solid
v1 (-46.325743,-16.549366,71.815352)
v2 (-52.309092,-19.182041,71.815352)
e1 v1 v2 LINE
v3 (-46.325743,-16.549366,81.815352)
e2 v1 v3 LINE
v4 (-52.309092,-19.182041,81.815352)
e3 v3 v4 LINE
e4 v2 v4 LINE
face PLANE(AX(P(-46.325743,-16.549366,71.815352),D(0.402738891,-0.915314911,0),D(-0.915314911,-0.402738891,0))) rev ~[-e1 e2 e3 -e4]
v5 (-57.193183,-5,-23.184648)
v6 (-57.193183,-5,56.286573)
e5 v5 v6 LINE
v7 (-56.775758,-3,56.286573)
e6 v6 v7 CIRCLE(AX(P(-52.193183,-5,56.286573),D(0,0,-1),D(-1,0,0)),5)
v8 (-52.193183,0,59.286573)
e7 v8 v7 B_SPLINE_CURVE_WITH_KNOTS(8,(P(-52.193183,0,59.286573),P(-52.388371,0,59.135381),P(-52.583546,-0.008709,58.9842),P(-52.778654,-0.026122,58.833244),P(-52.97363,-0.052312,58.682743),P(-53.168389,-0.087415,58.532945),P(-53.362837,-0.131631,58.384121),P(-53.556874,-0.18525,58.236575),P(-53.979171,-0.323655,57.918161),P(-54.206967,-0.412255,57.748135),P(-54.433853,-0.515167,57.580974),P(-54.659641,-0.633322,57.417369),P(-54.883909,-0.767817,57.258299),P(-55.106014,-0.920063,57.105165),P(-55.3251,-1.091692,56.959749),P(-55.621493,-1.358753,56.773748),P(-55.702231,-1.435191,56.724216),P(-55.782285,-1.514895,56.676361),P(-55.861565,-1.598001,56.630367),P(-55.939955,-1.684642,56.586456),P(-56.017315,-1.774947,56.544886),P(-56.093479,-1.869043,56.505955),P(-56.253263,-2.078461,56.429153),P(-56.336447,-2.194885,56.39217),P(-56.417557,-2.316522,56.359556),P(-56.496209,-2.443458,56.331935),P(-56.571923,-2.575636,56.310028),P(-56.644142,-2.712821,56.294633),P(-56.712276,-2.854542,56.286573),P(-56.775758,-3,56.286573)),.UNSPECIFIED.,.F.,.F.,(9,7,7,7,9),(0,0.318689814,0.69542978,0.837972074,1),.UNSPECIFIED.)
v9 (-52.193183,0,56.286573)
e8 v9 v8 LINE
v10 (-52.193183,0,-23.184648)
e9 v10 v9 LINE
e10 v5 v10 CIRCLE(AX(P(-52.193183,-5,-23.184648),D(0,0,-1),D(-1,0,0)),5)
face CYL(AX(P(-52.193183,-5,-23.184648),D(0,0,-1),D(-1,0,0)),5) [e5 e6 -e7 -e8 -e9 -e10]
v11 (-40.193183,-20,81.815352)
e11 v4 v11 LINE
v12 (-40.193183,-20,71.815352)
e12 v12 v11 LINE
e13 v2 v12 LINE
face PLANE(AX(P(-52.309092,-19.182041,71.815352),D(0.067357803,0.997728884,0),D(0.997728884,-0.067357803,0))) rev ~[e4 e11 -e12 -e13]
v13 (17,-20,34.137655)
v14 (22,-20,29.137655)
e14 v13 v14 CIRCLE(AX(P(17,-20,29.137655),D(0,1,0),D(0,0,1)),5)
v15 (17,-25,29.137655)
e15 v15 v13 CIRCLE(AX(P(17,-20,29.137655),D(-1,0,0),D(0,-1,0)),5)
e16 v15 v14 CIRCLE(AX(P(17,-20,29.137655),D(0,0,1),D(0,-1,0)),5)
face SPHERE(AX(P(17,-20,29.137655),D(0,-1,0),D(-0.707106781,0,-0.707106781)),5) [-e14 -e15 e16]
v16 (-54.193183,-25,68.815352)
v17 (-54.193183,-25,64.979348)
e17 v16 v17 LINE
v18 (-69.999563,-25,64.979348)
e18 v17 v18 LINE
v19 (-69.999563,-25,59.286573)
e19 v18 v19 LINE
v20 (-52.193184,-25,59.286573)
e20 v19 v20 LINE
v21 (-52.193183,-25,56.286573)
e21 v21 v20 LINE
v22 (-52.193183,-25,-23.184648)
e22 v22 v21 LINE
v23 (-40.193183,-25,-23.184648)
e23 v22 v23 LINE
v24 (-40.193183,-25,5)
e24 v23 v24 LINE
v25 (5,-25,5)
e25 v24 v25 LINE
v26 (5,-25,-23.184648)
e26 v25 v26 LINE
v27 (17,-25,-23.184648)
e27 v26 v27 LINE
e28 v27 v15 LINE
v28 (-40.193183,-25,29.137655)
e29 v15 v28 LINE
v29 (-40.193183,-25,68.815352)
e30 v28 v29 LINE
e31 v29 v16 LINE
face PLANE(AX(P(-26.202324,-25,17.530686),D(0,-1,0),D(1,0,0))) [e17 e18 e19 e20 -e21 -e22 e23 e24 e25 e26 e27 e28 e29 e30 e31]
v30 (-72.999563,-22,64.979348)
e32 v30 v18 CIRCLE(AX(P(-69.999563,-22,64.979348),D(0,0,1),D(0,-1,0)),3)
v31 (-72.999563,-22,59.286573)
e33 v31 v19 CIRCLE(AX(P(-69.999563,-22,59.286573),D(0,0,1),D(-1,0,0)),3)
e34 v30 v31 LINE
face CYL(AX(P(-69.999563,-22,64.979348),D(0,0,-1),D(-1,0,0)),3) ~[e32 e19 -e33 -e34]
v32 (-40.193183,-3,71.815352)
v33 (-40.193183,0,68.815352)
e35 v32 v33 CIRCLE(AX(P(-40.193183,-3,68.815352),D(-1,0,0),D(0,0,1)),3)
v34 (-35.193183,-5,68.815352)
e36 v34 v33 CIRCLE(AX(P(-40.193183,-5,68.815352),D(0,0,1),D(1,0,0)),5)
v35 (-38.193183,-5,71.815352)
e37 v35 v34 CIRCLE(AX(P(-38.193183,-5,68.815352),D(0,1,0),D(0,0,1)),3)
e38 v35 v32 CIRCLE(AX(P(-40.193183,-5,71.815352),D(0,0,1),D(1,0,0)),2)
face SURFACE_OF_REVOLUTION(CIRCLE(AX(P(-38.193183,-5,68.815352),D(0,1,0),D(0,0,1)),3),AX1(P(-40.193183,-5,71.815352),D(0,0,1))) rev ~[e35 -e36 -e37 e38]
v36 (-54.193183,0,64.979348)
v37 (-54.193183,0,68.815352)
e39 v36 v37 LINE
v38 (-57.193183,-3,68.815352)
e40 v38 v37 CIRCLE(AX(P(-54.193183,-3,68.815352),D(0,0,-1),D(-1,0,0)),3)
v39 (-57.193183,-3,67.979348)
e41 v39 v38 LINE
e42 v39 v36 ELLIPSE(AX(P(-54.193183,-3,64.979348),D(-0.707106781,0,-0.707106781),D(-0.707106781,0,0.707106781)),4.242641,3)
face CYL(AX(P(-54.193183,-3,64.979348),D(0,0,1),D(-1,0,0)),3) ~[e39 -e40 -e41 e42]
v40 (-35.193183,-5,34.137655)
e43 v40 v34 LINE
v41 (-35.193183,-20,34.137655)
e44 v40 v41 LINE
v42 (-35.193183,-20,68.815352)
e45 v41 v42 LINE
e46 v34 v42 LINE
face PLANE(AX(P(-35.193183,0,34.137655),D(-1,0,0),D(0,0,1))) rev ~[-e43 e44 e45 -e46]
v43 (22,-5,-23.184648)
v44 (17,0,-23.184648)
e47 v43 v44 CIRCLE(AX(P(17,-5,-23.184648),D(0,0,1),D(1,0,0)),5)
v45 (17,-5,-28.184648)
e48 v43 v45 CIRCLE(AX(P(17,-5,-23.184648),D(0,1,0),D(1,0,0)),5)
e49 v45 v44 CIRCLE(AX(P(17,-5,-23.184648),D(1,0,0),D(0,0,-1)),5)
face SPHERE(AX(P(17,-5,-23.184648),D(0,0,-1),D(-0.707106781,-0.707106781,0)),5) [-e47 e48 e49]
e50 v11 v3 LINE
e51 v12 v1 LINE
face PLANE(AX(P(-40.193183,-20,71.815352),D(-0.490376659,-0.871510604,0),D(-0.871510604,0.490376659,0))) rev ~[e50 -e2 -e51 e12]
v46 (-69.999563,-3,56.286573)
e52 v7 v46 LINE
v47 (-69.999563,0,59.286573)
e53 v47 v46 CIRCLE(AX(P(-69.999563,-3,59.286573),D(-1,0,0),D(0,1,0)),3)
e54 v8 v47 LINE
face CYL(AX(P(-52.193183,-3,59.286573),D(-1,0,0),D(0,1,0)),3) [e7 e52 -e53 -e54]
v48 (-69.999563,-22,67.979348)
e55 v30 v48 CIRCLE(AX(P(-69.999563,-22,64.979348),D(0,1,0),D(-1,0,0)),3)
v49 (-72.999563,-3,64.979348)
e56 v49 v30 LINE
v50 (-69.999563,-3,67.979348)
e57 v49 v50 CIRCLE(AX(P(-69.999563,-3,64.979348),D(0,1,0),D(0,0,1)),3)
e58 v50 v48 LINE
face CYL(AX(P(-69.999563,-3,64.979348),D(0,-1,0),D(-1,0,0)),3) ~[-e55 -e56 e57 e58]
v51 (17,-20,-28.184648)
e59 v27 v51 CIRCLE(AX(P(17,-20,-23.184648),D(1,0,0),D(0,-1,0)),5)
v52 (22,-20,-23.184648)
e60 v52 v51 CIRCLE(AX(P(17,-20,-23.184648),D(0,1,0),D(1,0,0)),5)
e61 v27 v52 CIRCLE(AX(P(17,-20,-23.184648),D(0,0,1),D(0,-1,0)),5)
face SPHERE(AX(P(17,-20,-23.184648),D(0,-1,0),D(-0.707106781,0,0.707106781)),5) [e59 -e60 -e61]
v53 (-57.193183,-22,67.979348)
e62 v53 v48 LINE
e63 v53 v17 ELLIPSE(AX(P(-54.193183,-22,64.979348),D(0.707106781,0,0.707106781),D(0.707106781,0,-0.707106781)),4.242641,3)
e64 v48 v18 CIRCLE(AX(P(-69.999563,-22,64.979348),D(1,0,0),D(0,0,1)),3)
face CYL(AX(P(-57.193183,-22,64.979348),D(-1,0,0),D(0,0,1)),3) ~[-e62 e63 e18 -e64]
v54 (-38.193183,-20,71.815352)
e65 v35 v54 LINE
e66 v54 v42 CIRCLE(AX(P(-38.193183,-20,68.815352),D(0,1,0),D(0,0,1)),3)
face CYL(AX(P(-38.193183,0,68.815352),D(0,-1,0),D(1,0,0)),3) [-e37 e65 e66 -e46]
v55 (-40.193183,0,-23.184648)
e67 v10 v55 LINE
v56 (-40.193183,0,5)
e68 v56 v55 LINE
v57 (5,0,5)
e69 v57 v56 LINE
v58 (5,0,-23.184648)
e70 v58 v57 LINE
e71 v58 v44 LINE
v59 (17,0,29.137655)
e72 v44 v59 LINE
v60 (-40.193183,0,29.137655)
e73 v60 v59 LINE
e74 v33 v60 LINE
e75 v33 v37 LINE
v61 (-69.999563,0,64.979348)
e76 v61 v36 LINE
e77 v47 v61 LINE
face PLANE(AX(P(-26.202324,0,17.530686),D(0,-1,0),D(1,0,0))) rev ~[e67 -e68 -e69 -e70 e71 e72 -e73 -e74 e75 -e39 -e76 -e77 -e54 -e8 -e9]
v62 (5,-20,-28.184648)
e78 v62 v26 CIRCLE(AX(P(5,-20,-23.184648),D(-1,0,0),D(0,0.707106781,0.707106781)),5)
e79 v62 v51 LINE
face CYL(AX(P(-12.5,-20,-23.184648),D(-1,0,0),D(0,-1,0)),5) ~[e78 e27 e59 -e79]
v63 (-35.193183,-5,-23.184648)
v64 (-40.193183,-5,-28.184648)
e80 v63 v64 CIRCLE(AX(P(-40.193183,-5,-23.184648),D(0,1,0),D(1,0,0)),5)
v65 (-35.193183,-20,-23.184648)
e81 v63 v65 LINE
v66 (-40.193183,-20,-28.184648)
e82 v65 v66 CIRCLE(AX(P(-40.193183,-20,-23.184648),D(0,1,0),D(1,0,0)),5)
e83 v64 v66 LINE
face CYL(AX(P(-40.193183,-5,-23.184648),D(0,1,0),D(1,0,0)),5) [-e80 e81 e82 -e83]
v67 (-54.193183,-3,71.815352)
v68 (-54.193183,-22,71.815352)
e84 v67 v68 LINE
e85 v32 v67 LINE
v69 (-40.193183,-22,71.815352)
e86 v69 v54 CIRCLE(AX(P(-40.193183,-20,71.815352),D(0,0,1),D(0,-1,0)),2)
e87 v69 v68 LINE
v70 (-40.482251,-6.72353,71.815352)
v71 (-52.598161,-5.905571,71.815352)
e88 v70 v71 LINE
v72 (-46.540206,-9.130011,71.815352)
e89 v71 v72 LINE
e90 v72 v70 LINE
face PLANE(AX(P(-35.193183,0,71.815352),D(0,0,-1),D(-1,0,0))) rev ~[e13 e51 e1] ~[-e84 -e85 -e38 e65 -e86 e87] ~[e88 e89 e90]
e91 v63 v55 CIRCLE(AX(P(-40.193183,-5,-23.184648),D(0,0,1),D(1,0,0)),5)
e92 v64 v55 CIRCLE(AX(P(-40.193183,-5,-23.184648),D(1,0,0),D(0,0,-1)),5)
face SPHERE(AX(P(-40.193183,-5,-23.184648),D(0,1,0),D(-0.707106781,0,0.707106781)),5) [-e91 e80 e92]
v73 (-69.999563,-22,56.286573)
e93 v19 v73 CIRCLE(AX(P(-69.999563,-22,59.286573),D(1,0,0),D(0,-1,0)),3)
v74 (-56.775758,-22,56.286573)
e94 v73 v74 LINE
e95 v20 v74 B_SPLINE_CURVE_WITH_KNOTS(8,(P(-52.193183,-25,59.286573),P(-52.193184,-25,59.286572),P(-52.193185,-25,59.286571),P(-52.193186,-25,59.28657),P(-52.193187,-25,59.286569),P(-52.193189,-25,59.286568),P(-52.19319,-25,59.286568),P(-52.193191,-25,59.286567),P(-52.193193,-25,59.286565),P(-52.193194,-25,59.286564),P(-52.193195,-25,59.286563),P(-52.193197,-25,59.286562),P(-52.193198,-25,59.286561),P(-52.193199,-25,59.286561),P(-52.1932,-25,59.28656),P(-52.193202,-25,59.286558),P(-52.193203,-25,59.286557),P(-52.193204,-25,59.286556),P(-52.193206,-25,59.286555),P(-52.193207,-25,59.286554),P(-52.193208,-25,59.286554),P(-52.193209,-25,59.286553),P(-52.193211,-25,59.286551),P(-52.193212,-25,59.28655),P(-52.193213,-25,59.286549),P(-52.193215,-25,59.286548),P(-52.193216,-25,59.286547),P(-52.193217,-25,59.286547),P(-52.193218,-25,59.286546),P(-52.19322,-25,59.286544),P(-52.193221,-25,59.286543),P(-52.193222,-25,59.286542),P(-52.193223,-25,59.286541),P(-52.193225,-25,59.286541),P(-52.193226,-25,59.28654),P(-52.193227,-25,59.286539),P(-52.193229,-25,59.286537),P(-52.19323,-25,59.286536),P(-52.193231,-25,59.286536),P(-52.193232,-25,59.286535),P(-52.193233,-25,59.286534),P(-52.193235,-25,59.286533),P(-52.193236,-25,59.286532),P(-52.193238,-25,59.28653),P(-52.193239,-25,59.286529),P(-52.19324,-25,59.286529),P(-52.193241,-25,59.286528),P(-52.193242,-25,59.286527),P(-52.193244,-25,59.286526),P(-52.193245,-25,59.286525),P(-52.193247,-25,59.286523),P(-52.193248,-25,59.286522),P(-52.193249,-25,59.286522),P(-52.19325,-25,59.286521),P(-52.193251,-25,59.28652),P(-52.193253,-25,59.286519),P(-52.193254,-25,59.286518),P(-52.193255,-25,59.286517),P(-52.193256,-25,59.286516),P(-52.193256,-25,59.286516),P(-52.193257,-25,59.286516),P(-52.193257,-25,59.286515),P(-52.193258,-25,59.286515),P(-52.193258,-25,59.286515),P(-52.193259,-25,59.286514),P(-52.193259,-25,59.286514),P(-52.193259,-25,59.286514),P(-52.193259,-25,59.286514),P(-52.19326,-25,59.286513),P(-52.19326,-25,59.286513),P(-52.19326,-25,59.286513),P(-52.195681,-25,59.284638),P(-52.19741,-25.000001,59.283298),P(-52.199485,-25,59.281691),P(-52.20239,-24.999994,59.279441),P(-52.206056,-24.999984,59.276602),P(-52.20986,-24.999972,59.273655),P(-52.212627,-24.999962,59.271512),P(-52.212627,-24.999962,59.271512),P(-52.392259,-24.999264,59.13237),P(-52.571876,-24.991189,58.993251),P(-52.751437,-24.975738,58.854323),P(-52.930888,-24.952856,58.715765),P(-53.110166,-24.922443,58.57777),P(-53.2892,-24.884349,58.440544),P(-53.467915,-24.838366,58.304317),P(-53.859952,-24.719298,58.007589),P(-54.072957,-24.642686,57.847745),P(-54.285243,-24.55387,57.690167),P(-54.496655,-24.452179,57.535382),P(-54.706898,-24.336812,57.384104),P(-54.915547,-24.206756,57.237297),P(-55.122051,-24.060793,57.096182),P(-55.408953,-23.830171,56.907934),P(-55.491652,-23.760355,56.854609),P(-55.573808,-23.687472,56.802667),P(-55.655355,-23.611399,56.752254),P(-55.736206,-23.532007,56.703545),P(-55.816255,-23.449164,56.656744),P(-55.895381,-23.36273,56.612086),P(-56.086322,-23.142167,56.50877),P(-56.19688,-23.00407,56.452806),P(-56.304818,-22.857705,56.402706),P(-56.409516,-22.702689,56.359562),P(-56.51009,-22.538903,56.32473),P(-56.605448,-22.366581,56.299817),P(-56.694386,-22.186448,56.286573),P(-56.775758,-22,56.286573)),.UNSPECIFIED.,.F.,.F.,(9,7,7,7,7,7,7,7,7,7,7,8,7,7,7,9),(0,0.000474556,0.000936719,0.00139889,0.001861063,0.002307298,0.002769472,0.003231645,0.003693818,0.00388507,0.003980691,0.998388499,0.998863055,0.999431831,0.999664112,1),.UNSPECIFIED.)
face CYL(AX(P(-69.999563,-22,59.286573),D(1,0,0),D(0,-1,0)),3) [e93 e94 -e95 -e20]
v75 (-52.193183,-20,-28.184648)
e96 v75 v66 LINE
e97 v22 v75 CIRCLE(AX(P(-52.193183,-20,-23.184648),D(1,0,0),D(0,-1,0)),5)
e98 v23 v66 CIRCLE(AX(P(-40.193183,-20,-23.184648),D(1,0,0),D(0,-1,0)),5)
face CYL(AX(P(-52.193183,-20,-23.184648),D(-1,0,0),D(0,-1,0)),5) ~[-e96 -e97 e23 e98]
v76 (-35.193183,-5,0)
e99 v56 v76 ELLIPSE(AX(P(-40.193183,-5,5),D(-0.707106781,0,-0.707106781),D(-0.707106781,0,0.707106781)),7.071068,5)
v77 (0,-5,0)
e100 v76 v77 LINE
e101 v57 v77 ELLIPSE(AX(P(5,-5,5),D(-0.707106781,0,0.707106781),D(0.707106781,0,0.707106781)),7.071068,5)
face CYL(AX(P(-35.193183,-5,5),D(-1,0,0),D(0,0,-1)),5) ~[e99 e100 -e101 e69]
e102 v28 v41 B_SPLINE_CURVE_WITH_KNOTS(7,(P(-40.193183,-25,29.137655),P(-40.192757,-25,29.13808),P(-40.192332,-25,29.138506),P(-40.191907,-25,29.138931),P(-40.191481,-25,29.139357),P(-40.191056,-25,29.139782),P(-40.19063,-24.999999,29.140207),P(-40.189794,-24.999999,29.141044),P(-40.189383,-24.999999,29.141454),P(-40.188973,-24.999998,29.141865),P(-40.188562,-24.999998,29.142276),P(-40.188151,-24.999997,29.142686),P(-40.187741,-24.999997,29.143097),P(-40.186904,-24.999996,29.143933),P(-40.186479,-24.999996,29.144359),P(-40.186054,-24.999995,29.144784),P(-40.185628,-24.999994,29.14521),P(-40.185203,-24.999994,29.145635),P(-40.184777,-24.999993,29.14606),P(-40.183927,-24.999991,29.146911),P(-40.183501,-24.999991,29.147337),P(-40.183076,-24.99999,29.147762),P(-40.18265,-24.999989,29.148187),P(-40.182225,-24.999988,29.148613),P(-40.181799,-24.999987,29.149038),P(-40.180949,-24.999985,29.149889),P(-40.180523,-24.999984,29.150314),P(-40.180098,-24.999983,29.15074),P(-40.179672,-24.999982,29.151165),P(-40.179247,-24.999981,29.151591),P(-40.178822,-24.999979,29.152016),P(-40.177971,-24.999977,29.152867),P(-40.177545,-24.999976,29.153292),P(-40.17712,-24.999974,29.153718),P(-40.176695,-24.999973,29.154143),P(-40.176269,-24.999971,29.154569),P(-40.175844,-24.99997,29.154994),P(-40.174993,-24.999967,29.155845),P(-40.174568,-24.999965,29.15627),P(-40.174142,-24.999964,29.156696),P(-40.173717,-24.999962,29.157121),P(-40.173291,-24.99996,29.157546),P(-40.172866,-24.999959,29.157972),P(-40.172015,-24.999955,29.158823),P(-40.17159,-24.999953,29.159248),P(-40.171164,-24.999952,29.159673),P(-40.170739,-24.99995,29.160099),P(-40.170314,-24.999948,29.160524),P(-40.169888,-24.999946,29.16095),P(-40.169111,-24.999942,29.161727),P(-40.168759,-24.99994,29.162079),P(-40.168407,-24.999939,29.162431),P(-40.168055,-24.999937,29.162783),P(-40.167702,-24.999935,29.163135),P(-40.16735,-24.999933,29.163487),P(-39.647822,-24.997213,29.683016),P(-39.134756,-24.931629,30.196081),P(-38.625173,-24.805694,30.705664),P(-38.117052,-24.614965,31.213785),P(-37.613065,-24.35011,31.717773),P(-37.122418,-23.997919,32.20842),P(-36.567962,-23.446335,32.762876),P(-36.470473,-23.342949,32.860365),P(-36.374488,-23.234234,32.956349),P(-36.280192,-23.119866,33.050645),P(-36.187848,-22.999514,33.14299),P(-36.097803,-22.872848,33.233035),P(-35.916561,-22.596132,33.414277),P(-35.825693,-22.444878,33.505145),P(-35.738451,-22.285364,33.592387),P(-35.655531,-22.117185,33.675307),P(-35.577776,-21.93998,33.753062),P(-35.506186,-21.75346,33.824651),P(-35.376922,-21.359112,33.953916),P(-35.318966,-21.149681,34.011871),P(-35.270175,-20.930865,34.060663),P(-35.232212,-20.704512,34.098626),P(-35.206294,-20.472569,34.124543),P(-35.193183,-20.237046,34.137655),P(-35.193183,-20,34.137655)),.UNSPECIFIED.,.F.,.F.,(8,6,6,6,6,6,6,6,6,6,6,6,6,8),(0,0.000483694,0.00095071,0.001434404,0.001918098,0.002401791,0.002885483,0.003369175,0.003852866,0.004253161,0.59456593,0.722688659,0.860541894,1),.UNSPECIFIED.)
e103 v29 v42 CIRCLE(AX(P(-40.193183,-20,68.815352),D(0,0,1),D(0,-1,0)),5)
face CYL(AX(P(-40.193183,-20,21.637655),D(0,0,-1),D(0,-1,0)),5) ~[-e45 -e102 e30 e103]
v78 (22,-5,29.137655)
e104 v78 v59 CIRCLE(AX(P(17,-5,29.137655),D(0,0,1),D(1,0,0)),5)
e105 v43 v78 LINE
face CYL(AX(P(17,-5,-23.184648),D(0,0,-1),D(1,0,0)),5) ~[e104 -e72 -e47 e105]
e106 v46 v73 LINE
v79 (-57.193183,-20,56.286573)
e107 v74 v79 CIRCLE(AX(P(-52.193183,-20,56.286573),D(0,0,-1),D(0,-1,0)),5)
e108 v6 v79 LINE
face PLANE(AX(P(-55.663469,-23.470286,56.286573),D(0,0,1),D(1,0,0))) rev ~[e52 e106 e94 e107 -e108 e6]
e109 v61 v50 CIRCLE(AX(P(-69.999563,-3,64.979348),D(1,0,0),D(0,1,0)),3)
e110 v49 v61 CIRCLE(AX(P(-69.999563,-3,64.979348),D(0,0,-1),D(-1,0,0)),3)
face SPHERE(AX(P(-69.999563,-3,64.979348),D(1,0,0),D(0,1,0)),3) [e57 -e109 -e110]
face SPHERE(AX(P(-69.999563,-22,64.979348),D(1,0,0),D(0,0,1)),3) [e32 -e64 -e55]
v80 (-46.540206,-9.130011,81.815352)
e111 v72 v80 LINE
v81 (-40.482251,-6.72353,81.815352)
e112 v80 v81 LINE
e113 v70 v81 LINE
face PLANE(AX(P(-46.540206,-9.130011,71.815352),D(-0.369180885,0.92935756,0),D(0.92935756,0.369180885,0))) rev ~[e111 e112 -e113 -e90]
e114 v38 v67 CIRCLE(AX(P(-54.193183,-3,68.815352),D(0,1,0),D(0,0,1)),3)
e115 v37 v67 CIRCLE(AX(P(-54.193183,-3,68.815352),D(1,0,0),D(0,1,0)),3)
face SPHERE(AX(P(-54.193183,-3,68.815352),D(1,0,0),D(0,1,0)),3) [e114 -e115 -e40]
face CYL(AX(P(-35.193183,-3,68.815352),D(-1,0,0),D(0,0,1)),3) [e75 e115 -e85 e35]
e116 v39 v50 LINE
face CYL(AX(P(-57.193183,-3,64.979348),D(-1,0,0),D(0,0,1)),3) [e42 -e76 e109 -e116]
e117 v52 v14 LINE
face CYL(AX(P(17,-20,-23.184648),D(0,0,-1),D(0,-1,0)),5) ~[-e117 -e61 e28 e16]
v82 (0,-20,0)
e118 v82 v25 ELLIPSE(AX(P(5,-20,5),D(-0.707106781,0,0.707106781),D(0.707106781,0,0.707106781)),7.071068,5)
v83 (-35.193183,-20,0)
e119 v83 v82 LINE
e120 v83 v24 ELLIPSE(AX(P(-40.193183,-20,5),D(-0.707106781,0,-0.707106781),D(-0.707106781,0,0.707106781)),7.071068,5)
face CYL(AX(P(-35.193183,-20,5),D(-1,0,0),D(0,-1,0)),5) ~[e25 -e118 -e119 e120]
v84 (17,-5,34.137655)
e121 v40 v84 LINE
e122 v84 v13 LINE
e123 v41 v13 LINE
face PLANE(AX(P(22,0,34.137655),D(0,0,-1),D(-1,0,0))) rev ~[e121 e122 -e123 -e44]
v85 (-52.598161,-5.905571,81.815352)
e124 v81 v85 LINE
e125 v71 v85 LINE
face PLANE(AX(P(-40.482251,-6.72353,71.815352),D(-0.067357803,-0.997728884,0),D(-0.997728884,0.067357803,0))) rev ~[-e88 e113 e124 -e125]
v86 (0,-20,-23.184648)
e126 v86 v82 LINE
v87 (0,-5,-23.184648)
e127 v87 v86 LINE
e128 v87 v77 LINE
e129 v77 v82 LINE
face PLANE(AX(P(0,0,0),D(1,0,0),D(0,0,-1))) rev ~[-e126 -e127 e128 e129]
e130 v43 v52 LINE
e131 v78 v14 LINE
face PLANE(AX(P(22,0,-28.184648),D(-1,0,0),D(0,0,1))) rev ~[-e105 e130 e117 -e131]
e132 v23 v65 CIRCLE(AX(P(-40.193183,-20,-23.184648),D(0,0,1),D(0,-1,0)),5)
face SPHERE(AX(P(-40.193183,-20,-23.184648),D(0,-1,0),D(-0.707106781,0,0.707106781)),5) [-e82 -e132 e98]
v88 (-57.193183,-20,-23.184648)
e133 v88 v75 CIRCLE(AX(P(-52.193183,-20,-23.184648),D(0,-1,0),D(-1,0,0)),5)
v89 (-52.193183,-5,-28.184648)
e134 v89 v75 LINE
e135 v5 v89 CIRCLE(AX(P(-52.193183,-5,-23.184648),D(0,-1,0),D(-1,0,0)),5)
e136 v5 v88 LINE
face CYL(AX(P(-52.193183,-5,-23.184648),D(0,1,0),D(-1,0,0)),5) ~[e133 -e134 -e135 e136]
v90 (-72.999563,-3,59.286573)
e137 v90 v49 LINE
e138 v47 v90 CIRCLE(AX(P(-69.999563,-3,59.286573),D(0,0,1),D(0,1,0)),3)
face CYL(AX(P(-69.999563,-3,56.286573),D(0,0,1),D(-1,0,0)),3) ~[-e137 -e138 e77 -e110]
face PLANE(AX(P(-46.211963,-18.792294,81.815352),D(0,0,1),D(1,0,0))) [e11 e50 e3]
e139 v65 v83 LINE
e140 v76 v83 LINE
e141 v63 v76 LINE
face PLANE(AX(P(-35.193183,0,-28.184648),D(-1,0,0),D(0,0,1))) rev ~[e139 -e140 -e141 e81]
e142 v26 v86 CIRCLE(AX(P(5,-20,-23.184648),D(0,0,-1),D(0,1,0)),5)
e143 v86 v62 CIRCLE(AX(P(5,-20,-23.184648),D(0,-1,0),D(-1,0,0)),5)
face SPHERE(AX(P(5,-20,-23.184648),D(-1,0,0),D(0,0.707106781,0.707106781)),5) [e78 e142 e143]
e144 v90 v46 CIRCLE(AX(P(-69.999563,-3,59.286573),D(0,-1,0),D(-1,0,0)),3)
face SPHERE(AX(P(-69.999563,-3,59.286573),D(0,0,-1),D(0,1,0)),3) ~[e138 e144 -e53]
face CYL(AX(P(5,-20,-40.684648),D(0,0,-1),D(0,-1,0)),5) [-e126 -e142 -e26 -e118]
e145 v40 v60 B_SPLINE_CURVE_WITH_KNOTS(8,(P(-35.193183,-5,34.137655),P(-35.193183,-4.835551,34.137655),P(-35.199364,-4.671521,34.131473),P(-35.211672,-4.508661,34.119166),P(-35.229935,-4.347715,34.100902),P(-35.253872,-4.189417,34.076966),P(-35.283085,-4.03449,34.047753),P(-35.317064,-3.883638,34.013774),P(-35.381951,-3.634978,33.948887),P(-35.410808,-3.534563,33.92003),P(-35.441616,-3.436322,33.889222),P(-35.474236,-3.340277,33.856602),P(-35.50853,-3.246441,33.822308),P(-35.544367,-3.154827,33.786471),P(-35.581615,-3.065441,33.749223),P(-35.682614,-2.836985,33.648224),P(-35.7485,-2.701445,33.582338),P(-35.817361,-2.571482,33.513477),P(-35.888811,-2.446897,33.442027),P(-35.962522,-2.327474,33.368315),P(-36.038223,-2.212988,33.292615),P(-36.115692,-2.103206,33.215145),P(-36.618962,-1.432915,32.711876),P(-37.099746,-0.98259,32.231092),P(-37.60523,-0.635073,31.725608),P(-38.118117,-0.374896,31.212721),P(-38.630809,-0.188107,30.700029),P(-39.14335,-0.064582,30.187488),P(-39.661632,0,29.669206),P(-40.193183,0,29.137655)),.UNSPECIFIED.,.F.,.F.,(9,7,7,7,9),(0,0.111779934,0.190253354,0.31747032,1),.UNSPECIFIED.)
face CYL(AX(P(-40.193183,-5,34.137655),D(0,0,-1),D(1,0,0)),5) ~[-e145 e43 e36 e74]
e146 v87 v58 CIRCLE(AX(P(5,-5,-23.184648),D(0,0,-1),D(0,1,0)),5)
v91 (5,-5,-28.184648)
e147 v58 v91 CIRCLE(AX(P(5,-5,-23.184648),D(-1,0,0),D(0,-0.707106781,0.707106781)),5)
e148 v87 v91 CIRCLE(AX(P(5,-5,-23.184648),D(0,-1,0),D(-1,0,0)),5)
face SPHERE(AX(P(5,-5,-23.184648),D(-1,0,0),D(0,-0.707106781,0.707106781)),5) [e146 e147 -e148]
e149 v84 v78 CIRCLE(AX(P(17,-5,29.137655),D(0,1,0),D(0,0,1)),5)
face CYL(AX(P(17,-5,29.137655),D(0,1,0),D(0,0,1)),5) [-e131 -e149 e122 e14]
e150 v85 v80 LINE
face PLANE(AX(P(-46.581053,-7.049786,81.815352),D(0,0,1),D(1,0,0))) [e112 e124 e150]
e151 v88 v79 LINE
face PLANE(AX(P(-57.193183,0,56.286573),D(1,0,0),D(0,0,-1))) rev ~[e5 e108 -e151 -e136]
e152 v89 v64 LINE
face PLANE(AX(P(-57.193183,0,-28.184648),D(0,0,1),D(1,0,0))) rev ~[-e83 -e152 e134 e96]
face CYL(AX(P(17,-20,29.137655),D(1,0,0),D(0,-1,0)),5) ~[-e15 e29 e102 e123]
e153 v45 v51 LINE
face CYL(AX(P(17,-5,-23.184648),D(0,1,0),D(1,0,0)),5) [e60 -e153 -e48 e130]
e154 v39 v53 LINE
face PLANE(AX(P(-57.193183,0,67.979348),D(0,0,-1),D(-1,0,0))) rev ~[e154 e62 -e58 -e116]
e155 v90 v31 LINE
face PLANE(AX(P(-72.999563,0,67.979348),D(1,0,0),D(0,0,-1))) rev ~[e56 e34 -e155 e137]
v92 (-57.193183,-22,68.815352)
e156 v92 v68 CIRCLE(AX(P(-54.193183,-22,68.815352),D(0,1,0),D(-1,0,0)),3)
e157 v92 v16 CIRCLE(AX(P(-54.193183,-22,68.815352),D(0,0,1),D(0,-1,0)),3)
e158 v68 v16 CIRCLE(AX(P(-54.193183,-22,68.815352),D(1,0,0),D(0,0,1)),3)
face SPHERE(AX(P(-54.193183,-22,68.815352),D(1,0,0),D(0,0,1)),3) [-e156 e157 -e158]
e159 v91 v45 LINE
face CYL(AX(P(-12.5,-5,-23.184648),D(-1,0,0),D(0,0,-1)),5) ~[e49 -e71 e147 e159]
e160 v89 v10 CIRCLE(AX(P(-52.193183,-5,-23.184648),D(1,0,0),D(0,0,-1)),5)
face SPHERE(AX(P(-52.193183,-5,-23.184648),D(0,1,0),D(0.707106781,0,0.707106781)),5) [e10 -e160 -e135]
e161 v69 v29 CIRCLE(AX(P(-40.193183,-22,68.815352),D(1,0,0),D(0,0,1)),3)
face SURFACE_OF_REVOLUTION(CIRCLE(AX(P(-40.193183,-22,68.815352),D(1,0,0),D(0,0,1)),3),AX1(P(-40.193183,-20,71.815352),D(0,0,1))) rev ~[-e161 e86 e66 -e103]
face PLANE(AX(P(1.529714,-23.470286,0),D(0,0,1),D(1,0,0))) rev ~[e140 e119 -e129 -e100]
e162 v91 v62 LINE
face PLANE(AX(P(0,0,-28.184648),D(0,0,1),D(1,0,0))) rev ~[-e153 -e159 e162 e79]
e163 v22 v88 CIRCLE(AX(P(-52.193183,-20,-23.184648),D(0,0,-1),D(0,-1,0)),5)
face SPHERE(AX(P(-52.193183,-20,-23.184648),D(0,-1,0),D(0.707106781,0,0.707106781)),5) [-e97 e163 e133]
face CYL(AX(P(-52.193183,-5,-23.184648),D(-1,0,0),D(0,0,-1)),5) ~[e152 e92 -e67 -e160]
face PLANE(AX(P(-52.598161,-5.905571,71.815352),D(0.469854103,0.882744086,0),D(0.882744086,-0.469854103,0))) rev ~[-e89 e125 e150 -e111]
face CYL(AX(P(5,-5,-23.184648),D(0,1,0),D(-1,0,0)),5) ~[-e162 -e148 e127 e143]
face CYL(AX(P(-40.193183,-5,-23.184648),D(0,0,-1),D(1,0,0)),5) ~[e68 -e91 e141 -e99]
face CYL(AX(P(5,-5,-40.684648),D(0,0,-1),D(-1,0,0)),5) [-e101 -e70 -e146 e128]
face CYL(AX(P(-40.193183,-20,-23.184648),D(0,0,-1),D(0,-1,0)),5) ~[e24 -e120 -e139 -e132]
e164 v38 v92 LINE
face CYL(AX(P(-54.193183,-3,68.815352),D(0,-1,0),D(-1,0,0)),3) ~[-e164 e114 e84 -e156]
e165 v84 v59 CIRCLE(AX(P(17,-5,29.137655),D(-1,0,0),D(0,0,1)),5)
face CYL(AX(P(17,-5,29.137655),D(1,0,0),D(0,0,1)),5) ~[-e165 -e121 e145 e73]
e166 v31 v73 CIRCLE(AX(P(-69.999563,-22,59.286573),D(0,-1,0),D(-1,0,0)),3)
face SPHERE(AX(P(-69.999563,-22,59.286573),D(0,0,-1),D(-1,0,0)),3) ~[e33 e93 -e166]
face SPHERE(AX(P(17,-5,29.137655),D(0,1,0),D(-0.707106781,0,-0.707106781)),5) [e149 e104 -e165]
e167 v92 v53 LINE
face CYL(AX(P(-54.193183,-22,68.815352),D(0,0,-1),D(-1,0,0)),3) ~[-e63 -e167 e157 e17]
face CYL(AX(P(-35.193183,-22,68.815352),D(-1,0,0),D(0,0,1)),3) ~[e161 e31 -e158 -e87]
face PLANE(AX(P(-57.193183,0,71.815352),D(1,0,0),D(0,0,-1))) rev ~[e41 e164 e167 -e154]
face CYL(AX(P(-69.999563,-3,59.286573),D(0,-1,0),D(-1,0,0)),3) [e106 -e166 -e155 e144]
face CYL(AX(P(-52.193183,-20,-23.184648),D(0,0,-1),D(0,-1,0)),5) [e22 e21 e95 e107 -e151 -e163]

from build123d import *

# Parameters (mm, degrees)
F1_DEPTH      = 25
F2_R          = 3
F3_R          = 3
F4_T1_DEPTH   = 52.1931828042
F4_T3_DEPTH   = 15
F4_T5_DEPTH   = 52.3223032383
F4_T7_DEPTH   = 40.6846483105
F4_T9_DEPTH   = 79.471221308
F4_T11_DEPTH  = 23.1846483105
F4_T13_DEPTH  = 35.1931828042
F4_T15_DEPTH  = 12
F4_T17_DEPTH  = 29.5
F4_T19_DEPTH  = 37.6776967617
F4_T22_ANGLE  = 90
F4_T24_ANGLE  = 90
F4_S27_W      = 5.1
F4_S27_H      = 5.1
F4_T28_DEPTH  = 5.1
F4_S33_W      = 5.1
F4_S33_H      = 5.1
F4_T34_DEPTH  = 5.1
F4_S39_W      = 5.1
F4_S39_H      = 5.1
F4_T40_DEPTH  = 5.1
F4_S45_W      = 5.1
F4_S45_H      = 5.1
F4_T46_DEPTH  = 5.1
F4_S51_W      = 5.1
F4_S51_H      = 5.1
F4_T52_DEPTH  = 5.1
F4_S57_W      = 5.1
F4_S57_H      = 5.1
F4_T58_DEPTH  = 5.1
F4_S63_W      = 5.1
F4_S63_H      = 5.1
F4_T64_DEPTH  = 5.1
F4_S69_W      = 5.1
F4_S69_H      = 5.1
F4_T70_DEPTH  = 5.1
F4_T77_DEPTH  = 50.1776967617
F4_T81_DEPTH  = 64.6931828042
F4_T88_DEPTH  = 50.1776967617
F4_T92_DEPTH  = 64.6931828042
F4_T99_DEPTH  = 40.6846483105
F4_T103_DEPTH = 47.6931828042
F4_T110_DEPTH = 40.6846483105
F4_T114_DEPTH = 47.6931828042
F4_T121_DEPTH = 47.6931828042
F4_T125_DEPTH = 35.6846483105
F4_T132_DEPTH = 47.6931828042
F4_T136_DEPTH = 35.6846483105
F5_R          = 3
F6_T1_DEPTH   = 15
F6_S5_W       = 5
F6_S5_H       = 5
F6_T6_DEPTH   = 5
F6_S11_W      = 5
F6_S11_H      = 5
F6_T12_DEPTH  = 5
F8_DEPTH      = 10


# Not quite as in the source:
# - a fillet or chamfer that OpenCascade refuses, or shapes differently, is made with other operations: its cross-section is extruded or revolved along the edge and cut away or added


with BuildPart() as f1:
    # F0 (on Front) → F1 (new body)
    with BuildSketch(Plane.XZ):
        Polygon((-57.1931828042, 56.2865729975), (-57.1931828042, -28.1846483105), (-35.1931828042, -28.1846483105), (-35.1931828042, 0), (0, 0), (0, -28.1846483105), (22, -28.1846483105), (22, 0), (22, 34.1376549277), (-35.1931828042, 34.1376549277), (-35.1931828042, 71.8153516895), (-57.1931828042, 71.8153516895), (-57.1931828042, 67.9793483567), (-72.9995634697, 67.9793483567), (-72.9995634697, 56.2865729975), align=None)
    extrude(amount=F1_DEPTH)

    # F2
    f2_edges = [f1.edges().sort_by_distance(p)[0] for p in [
        (-46.193183, -25, 71.815352),
        (-35.193183, -12.5, 71.815352),
        (-46.193183, 0, 71.815352),
        (-65.096373, -25, 67.979348),
        (-65.096373, 0, 67.979348),
    ]]
    fillet(f2_edges, radius=F2_R)

    # F3
    f3_edges = [f1.edges().sort_by_distance(p)[0] for p in [
        (-57.193183, -12.5, 71.815352),
        (-72.999563, -12.5, 67.979348),
    ]]
    fillet(f3_edges, radius=F3_R)

    # F4: fillet of radius 5 on 22 edges, made by hand

    # F4_s2 → F4_t1 (cut)
    with BuildSketch(Plane.YZ.offset(-35.1931828042)):
        with BuildLine():
            ThreePointArc((-25, 29.1376549277), (-23.5355339059, 32.6731888337), (-20, 34.1376549277))
            Line((-20, 34.1376549277), (-25, 34.1376549277))
            Line((-25, 34.1376549277), (-25, 29.1376549277))
        make_face()
        with BuildLine():
            ThreePointArc((-5, 34.1376549277), (-1.4644660941, 32.6731888337), (0, 29.1376549277))
            Line((0, 29.1376549277), (0, 34.1376549277))
            Line((0, 34.1376549277), (-5, 34.1376549277))
        make_face()
    extrude(amount=F4_T1_DEPTH, mode=Mode.SUBTRACT)

    # F4_s4 → F4_t3 (cut)
    with BuildSketch(Plane.XZ.offset(5)):
        with BuildLine():
            ThreePointArc((17, 34.1376549277), (20.5355339059, 32.6731888337), (22, 29.1376549277))
            Line((22, 29.1376549277), (22, 34.1376549277))
            Line((22, 34.1376549277), (17, 34.1376549277))
        make_face()
        with BuildLine():
            ThreePointArc((-57.1931828042, -23.1846483105), (-55.7287167101, -26.7201822165), (-52.1931828042, -28.1846483105))
            Line((-52.1931828042, -28.1846483105), (-57.1931828042, -28.1846483105))
            Line((-57.1931828042, -28.1846483105), (-57.1931828042, -23.1846483105))
        make_face()
        with BuildLine():
            ThreePointArc((-35.1931828042, -23.1846483105), (-36.6576488983, -26.7201822165), (-40.1931828042, -28.1846483105))
            Line((-40.1931828042, -28.1846483105), (-35.1931828042, -28.1846483105))
            Line((-35.1931828042, -28.1846483105), (-35.1931828042, -23.1846483105))
        make_face()
        with BuildLine():
            ThreePointArc((22, -23.1846483105), (20.5355339059, -26.7201822165), (17, -28.1846483105))
            Line((17, -28.1846483105), (22, -28.1846483105))
            Line((22, -28.1846483105), (22, -23.1846483105))
        make_face()
    extrude(amount=F4_T3_DEPTH, mode=Mode.SUBTRACT)

    # F4_s6 → F4_t5 (cut)
    with BuildSketch(Plane.XY.offset(-23.1846483105)):
        with BuildLine():
            ThreePointArc((17, -25), (20.5355339059, -23.5355339059), (22, -20))
            Line((22, -20), (22, -25))
            Line((22, -25), (17, -25))
        make_face()
        with BuildLine():
            ThreePointArc((22, -5), (20.5355339059, -1.4644660941), (17, 0))
            Line((17, 0), (22, 0))
            Line((22, 0), (22, -5))
        make_face()
    extrude(amount=F4_T5_DEPTH, mode=Mode.SUBTRACT)

    # F4_s8 → F4_t7 (cut)
    with BuildSketch(Plane.XY.offset(-40.6846483105)):
        with BuildLine():
            ThreePointArc((0, -5), (1.4644660941, -1.4644660941), (5, 0))
            Line((5, 0), (0, 0))
            Line((0, 0), (0, -5))
        make_face()
        with BuildLine():
            ThreePointArc((5, -25), (1.4644660941, -23.5355339059), (0, -20))
            Line((0, -20), (0, -25))
            Line((0, -25), (5, -25))
        make_face()
    extrude(amount=F4_T7_DEPTH, mode=Mode.SUBTRACT)

    # F4_s10 → F4_t9 (cut)
    with BuildSketch(Plane.XY.offset(-23.1846483105)):
        with BuildLine():
            ThreePointArc((-57.1931828042, -5), (-55.7287167101, -1.4644660941), (-52.1931828042, 0))
            Line((-52.1931828042, 0), (-57.1931828042, 0))
            Line((-57.1931828042, 0), (-57.1931828042, -5))
        make_face()
        with BuildLine():
            ThreePointArc((-52.1931828042, -25), (-55.7287167101, -23.5355339059), (-57.1931828042, -20))
            Line((-57.1931828042, -20), (-57.1931828042, -25))
            Line((-57.1931828042, -25), (-52.1931828042, -25))
        make_face()
    extrude(amount=F4_T9_DEPTH, mode=Mode.SUBTRACT)

    # F4_s12 → F4_t11 (cut)
    with BuildSketch(Plane.XY.offset(-23.1846483105)):
        with BuildLine():
            ThreePointArc((-40.1931828042, -25), (-36.6576488983, -23.5355339059), (-35.1931828042, -20))
            Line((-35.1931828042, -20), (-35.1931828042, -25))
            Line((-35.1931828042, -25), (-40.1931828042, -25))
        make_face()
        with BuildLine():
            ThreePointArc((-35.1931828042, -5), (-36.6576488983, -1.4644660941), (-40.1931828042, 0))
            Line((-40.1931828042, 0), (-35.1931828042, 0))
            Line((-35.1931828042, 0), (-35.1931828042, -5))
        make_face()
    extrude(amount=F4_T11_DEPTH, mode=Mode.SUBTRACT)

    # F4_s14 → F4_t13 (cut)
    with BuildSketch(Plane.YZ.offset(-35.1931828042)):
        with BuildLine():
            ThreePointArc((-25, 5), (-23.5355339059, 1.4644660941), (-20, 0))
            Line((-20, 0), (-25, 0))
            Line((-25, 0), (-25, 5))
        make_face()
        with BuildLine():
            ThreePointArc((-5, 0), (-1.4644660941, 1.4644660941), (0, 5))
            Line((0, 5), (0, 0))
            Line((0, 0), (-5, 0))
        make_face()
    extrude(amount=F4_T13_DEPTH, mode=Mode.SUBTRACT)

    # F4_s16 → F4_t15 (cut)
    with BuildSketch(Plane.YZ.offset(-52.1931828042)):
        with BuildLine():
            ThreePointArc((-25, -23.1846483105), (-23.5355339059, -26.7201822165), (-20, -28.1846483105))
            Line((-20, -28.1846483105), (-25, -28.1846483105))
            Line((-25, -28.1846483105), (-25, -23.1846483105))
        make_face()
        with BuildLine():
            ThreePointArc((-5, -28.1846483105), (-1.4644660941, -26.7201822165), (0, -23.1846483105))
            Line((0, -23.1846483105), (0, -28.1846483105))
            Line((0, -28.1846483105), (-5, -28.1846483105))
        make_face()
    extrude(amount=F4_T15_DEPTH, mode=Mode.SUBTRACT)

    # F4_s18 → F4_t17 (cut)
    with BuildSketch(Plane.YZ.offset(-12.5)):
        with BuildLine():
            ThreePointArc((-25, -23.1846483105), (-23.5355339059, -26.7201822165), (-20, -28.1846483105))
            Line((-20, -28.1846483105), (-25, -28.1846483105))
            Line((-25, -28.1846483105), (-25, -23.1846483105))
        make_face()
        with BuildLine():
            ThreePointArc((-5, -28.1846483105), (-1.4644660941, -26.7201822165), (0, -23.1846483105))
            Line((0, -23.1846483105), (0, -28.1846483105))
            Line((0, -28.1846483105), (-5, -28.1846483105))
        make_face()
    extrude(amount=F4_T17_DEPTH, mode=Mode.SUBTRACT)

    # F4_s20 → F4_t19 (cut)
    with BuildSketch(Plane.XY.offset(34.1376549277)):
        with BuildLine():
            ThreePointArc((-40.1931828042, -25), (-36.6576488983, -23.5355339059), (-35.1931828042, -20))
            Line((-35.1931828042, -20), (-35.1931828042, -25))
            Line((-35.1931828042, -25), (-40.1931828042, -25))
        make_face()
        with BuildLine():
            ThreePointArc((-35.1931828042, -5), (-36.6576488983, -1.4644660941), (-40.1931828042, 0))
            Line((-40.1931828042, 0), (-35.1931828042, 0))
            Line((-35.1931828042, 0), (-35.1931828042, -5))
        make_face()
    extrude(amount=F4_T19_DEPTH, mode=Mode.SUBTRACT)

    # F4_s21 → F4_t22 (revolve, cut)
    with BuildSketch(Plane.XZ.offset(5)):
        with BuildLine():
            ThreePointArc((-38.1931828042, 71.8153516895), (-36.0718624607, 70.936672033), (-35.1931828042, 68.8153516895))
            Line((-35.1931828042, 68.8153516895), (-35.1931828042, 71.8153516895))
            Line((-35.1931828042, 71.8153516895), (-38.1931828042, 71.8153516895))
        make_face()
    revolve(axis=Axis((-40.1931828042, -5, 71.8153516895), (0, 0, 1)), revolution_arc=F4_T22_ANGLE, mode=Mode.SUBTRACT)

    # F4_s23 → F4_t24 (revolve, cut)
    with BuildSketch(Plane.YZ.offset(-40.1931828042)):
        with BuildLine():
            ThreePointArc((-22, 71.8153516895), (-24.1213203436, 70.936672033), (-25, 68.8153516895))
            Line((-25, 68.8153516895), (-25, 71.8153516895))
            Line((-25, 71.8153516895), (-22, 71.8153516895))
        make_face()
    revolve(axis=Axis((-40.1931828042, -20, 71.8153516895), (0, 0, 1)), revolution_arc=F4_T24_ANGLE, mode=Mode.SUBTRACT)


with BuildPart() as f4_tool26:
    # F4_s27 → F4_t28 (new body)
    with BuildSketch(Plane.XZ.offset(20)):
        with Locations((19.55, 31.6876549277)):
            Rectangle(F4_S27_W, F4_S27_H)
    extrude(amount=F4_T28_DEPTH)

    # F4_s29 → F4_t30 (revolve, cut)
    with BuildSketch(Plane(origin=(17, -20, 29.1376549277), x_dir=(-0.7071067812, 0, -0.7071067812), z_dir=(-0.7071067812, 0, 0.7071067812))):
        with BuildLine():
            ThreePointArc((0, -5), (5, 0), (0, 5))
            Line((0, 5), (0, -5))
        make_face()
    revolve(axis=Axis((17, -20, 29.1376549277), (0, -1, 0)), mode=Mode.SUBTRACT)


with BuildPart() as f1_1:
    add(f1.part)

    # F4_t25: cut F4_tool26
    add(f4_tool26.part, mode=Mode.SUBTRACT)


with BuildPart() as f4_tool32:
    # F4_s33 → F4_t34 (new body)
    with BuildSketch(Plane.XZ.offset(5)):
        with Locations((19.55, 31.6876549277)):
            Rectangle(F4_S33_W, F4_S33_H)
    extrude(amount=-F4_T34_DEPTH)

    # F4_s35 → F4_t36 (revolve, cut)
    with BuildSketch(Plane(origin=(17, -5, 29.1376549277), x_dir=(-0.7071067812, 0, -0.7071067812), z_dir=(0.7071067812, 0, -0.7071067812))):
        with BuildLine():
            ThreePointArc((0, -5), (5, 0), (0, 5))
            Line((0, 5), (0, -5))
        make_face()
    revolve(axis=Axis((17, -5, 29.1376549277), (0, 1, 0)), mode=Mode.SUBTRACT)


with BuildPart() as f1_2:
    add(f1_1.part)

    # F4_t31: cut F4_tool32
    add(f4_tool32.part, mode=Mode.SUBTRACT)


with BuildPart() as f4_tool38:
    # F4_s39 → F4_t40 (new body)
    with BuildSketch(Plane.XZ.offset(20)):
        with Locations((19.55, -25.7346483105)):
            Rectangle(F4_S39_W, F4_S39_H)
    extrude(amount=F4_T40_DEPTH)

    # F4_s41 → F4_t42 (revolve, cut)
    with BuildSketch(Plane(origin=(17, -20, -23.1846483105), x_dir=(-0.7071067812, 0, 0.7071067812), z_dir=(0.7071067812, 0, 0.7071067812))):
        with BuildLine():
            ThreePointArc((0, -5), (5, 0), (0, 5))
            Line((0, 5), (0, -5))
        make_face()
    revolve(axis=Axis((17, -20, -23.1846483105), (0, -1, 0)), mode=Mode.SUBTRACT)


with BuildPart() as f1_3:
    add(f1_2.part)

    # F4_t37: cut F4_tool38
    add(f4_tool38.part, mode=Mode.SUBTRACT)


with BuildPart() as f4_tool44:
    # F4_s45 → F4_t46 (new body)
    with BuildSketch(Plane.XZ.offset(5)):
        with Locations((-54.7431828042, -25.7346483105)):
            Rectangle(F4_S45_W, F4_S45_H)
    extrude(amount=-F4_T46_DEPTH)

    # F4_s47 → F4_t48 (revolve, cut)
    with BuildSketch(Plane(origin=(-52.1931828042, -5, -23.1846483105), x_dir=(0.7071067812, 0, 0.7071067812), z_dir=(-0.7071067812, 0, 0.7071067812))):
        with BuildLine():
            ThreePointArc((0, -5), (5, 0), (0, 5))
            Line((0, 5), (0, -5))
        make_face()
    revolve(axis=Axis((-52.1931828042, -5, -23.1846483105), (0, 1, 0)), mode=Mode.SUBTRACT)


with BuildPart() as f1_4:
    add(f1_3.part)

    # F4_t43: cut F4_tool44
    add(f4_tool44.part, mode=Mode.SUBTRACT)


with BuildPart() as f4_tool50:
    # F4_s51 → F4_t52 (new body)
    with BuildSketch(Plane.XZ.offset(20)):
        with Locations((-54.7431828042, -25.7346483105)):
            Rectangle(F4_S51_W, F4_S51_H)
    extrude(amount=F4_T52_DEPTH)

    # F4_s53 → F4_t54 (revolve, cut)
    with BuildSketch(Plane(origin=(-52.1931828042, -20, -23.1846483105), x_dir=(0.7071067812, 0, 0.7071067812), z_dir=(0.7071067812, 0, -0.7071067812))):
        with BuildLine():
            ThreePointArc((0, -5), (5, 0), (0, 5))
            Line((0, 5), (0, -5))
        make_face()
    revolve(axis=Axis((-52.1931828042, -20, -23.1846483105), (0, -1, 0)), mode=Mode.SUBTRACT)


with BuildPart() as f1_5:
    add(f1_4.part)

    # F4_t49: cut F4_tool50
    add(f4_tool50.part, mode=Mode.SUBTRACT)


with BuildPart() as f4_tool56:
    # F4_s57 → F4_t58 (new body)
    with BuildSketch(Plane.XZ.offset(20)):
        with Locations((-37.6431828042, -25.7346483105)):
            Rectangle(F4_S57_W, F4_S57_H)
    extrude(amount=F4_T58_DEPTH)

    # F4_s59 → F4_t60 (revolve, cut)
    with BuildSketch(Plane(origin=(-40.1931828042, -20, -23.1846483105), x_dir=(-0.7071067812, 0, 0.7071067812), z_dir=(0.7071067812, 0, 0.7071067812))):
        with BuildLine():
            ThreePointArc((0, -5), (5, 0), (0, 5))
            Line((0, 5), (0, -5))
        make_face()
    revolve(axis=Axis((-40.1931828042, -20, -23.1846483105), (0, -1, 0)), mode=Mode.SUBTRACT)


with BuildPart() as f1_6:
    add(f1_5.part)

    # F4_t55: cut F4_tool56
    add(f4_tool56.part, mode=Mode.SUBTRACT)


with BuildPart() as f4_tool62:
    # F4_s63 → F4_t64 (new body)
    with BuildSketch(Plane.XZ.offset(5)):
        with Locations((-37.6431828042, -25.7346483105)):
            Rectangle(F4_S63_W, F4_S63_H)
    extrude(amount=-F4_T64_DEPTH)

    # F4_s65 → F4_t66 (revolve, cut)
    with BuildSketch(Plane(origin=(-40.1931828042, -5, -23.1846483105), x_dir=(-0.7071067812, 0, 0.7071067812), z_dir=(-0.7071067812, 0, -0.7071067812))):
        with BuildLine():
            ThreePointArc((0, -5), (5, 0), (0, 5))
            Line((0, 5), (0, -5))
        make_face()
    revolve(axis=Axis((-40.1931828042, -5, -23.1846483105), (0, 1, 0)), mode=Mode.SUBTRACT)


with BuildPart() as f1_7:
    add(f1_6.part)

    # F4_t61: cut F4_tool62
    add(f4_tool62.part, mode=Mode.SUBTRACT)


with BuildPart() as f4_tool68:
    # F4_s69 → F4_t70 (new body)
    with BuildSketch(Plane.XY.offset(-23.1846483105)):
        with Locations((19.55, -2.45)):
            Rectangle(F4_S69_W, F4_S69_H)
    extrude(amount=-F4_T70_DEPTH)

    # F4_s71 → F4_t72 (revolve, cut)
    with BuildSketch(Plane(origin=(17, -5, -23.1846483105), x_dir=(-0.7071067812, -0.7071067812, 0), z_dir=(0.7071067812, -0.7071067812, 0))):
        with BuildLine():
            ThreePointArc((0, -5), (5, 0), (0, 5))
            Line((0, 5), (0, -5))
        make_face()
    revolve(axis=Axis((17, -5, -23.1846483105), (0, 0, -1)), mode=Mode.SUBTRACT)


with BuildPart() as f1_8:
    add(f1_7.part)

    # F4_t67: cut F4_tool68
    add(f4_tool68.part, mode=Mode.SUBTRACT)


with BuildPart() as f4_tool75:
    # F4_s76 → F4_t77 (new body)
    with BuildSketch(Plane.XY.offset(21.6376549277)):
        with BuildLine():
            ThreePointArc((-40.1931828042, -25), (-36.6576488983, -23.5355339059), (-35.1931828042, -20))
            Line((-35.1931828042, -20), (-35.1931828042, -25))
            Line((-35.1931828042, -25), (-40.1931828042, -25))
        make_face()
    extrude(amount=F4_T77_DEPTH)

    split(bisect_by=Plane.XY.offset(34.1376549277), keep=Keep.BOTTOM)


with BuildPart() as f4_tool79:
    # F4_s80 → F4_t81 (new body)
    with BuildSketch(Plane.YZ.offset(17)):
        with BuildLine():
            ThreePointArc((-25, 29.1376549277), (-23.5355339059, 32.6731888337), (-20, 34.1376549277))
            Line((-20, 34.1376549277), (-25, 34.1376549277))
            Line((-25, 34.1376549277), (-25, 29.1376549277))
        make_face()
    extrude(amount=-F4_T81_DEPTH)

    split(bisect_by=Plane.YZ.offset(-35.1931828042), keep=Keep.BOTTOM)


with BuildPart() as f4_tool75_1:
    add(f4_tool75.part)

    # F4_t83: intersect F4_tool79
    add(f4_tool79.part, mode=Mode.INTERSECT)


with BuildPart() as f1_9:
    add(f1_8.part)

    # F4_t73: cut F4_tool75
    add(f4_tool75_1.part, mode=Mode.SUBTRACT)


with BuildPart() as f4_tool86:
    # F4_s87 → F4_t88 (new body)
    with BuildSketch(Plane.XY.offset(21.6376549277)):
        with BuildLine():
            ThreePointArc((-35.1931828042, -5), (-36.6576488983, -1.4644660941), (-40.1931828042, 0))
            Line((-40.1931828042, 0), (-35.1931828042, 0))
            Line((-35.1931828042, 0), (-35.1931828042, -5))
        make_face()
    extrude(amount=F4_T88_DEPTH)

    split(bisect_by=Plane.XY.offset(34.1376549277), keep=Keep.BOTTOM)


with BuildPart() as f4_tool90:
    # F4_s91 → F4_t92 (new body)
    with BuildSketch(Plane.YZ.offset(17)):
        with BuildLine():
            ThreePointArc((-5, 34.1376549277), (-1.4644660941, 32.6731888337), (0, 29.1376549277))
            Line((0, 29.1376549277), (0, 34.1376549277))
            Line((0, 34.1376549277), (-5, 34.1376549277))
        make_face()
    extrude(amount=-F4_T92_DEPTH)

    split(bisect_by=Plane.YZ.offset(-35.1931828042), keep=Keep.BOTTOM)


with BuildPart() as f4_tool86_1:
    add(f4_tool86.part)

    # F4_t94: intersect F4_tool90
    add(f4_tool90.part, mode=Mode.INTERSECT)


with BuildPart() as f1_10:
    add(f1_9.part)

    # F4_t84: cut F4_tool86
    add(f4_tool86_1.part, mode=Mode.SUBTRACT)


with BuildPart() as f4_tool97:
    # F4_s98 → F4_t99 (new body)
    with BuildSketch(Plane.XY.offset(12.5)):
        with BuildLine():
            ThreePointArc((0, -5), (1.4644660941, -1.4644660941), (5, 0))
            Line((5, 0), (0, 0))
            Line((0, 0), (0, -5))
        make_face()
    extrude(amount=-F4_T99_DEPTH)

    split(bisect_by=Plane.XY, keep=Keep.TOP)


with BuildPart() as f4_tool101:
    # F4_s102 → F4_t103 (new body)
    with BuildSketch(Plane.YZ.offset(-35.1931828042)):
        with BuildLine():
            ThreePointArc((-5, 0), (-1.4644660941, 1.4644660941), (0, 5))
            Line((0, 5), (0, 0))
            Line((0, 0), (-5, 0))
        make_face()
    extrude(amount=F4_T103_DEPTH)

    split(bisect_by=Plane.YZ, keep=Keep.TOP)


with BuildPart() as f4_tool97_1:
    add(f4_tool97.part)

    # F4_t105: intersect F4_tool101
    add(f4_tool101.part, mode=Mode.INTERSECT)


with BuildPart() as f1_11:
    add(f1_10.part)

    # F4_t95: cut F4_tool97
    add(f4_tool97_1.part, mode=Mode.SUBTRACT)


with BuildPart() as f4_tool108:
    # F4_s109 → F4_t110 (new body)
    with BuildSketch(Plane.XY.offset(12.5)):
        with BuildLine():
            ThreePointArc((5, -25), (1.4644660941, -23.5355339059), (0, -20))
            Line((0, -20), (0, -25))
            Line((0, -25), (5, -25))
        make_face()
    extrude(amount=-F4_T110_DEPTH)

    split(bisect_by=Plane.XY, keep=Keep.TOP)


with BuildPart() as f4_tool112:
    # F4_s113 → F4_t114 (new body)
    with BuildSketch(Plane.YZ.offset(-35.1931828042)):
        with BuildLine():
            ThreePointArc((-25, 5), (-23.5355339059, 1.4644660941), (-20, 0))
            Line((-20, 0), (-25, 0))
            Line((-25, 0), (-25, 5))
        make_face()
    extrude(amount=F4_T114_DEPTH)

    split(bisect_by=Plane.YZ, keep=Keep.TOP)


with BuildPart() as f4_tool108_1:
    add(f4_tool108.part)

    # F4_t116: intersect F4_tool112
    add(f4_tool112.part, mode=Mode.INTERSECT)


with BuildPart() as f1_12:
    add(f1_11.part)

    # F4_t106: cut F4_tool108
    add(f4_tool108_1.part, mode=Mode.SUBTRACT)


with BuildPart() as f4_tool119:
    # F4_s120 → F4_t121 (new body)
    with BuildSketch(Plane.YZ.offset(-47.6931828042)):
        with BuildLine():
            ThreePointArc((-25, 5), (-23.5355339059, 1.4644660941), (-20, 0))
            Line((-20, 0), (-25, 0))
            Line((-25, 0), (-25, 5))
        make_face()
    extrude(amount=F4_T121_DEPTH)

    split(bisect_by=Plane.YZ.offset(-35.1931828042), keep=Keep.BOTTOM)


with BuildPart() as f4_tool123:
    # F4_s124 → F4_t125 (new body)
    with BuildSketch(Plane.XY.offset(-23.1846483105)):
        with BuildLine():
            ThreePointArc((-40.1931828042, -25), (-36.6576488983, -23.5355339059), (-35.1931828042, -20))
            Line((-35.1931828042, -20), (-35.1931828042, -25))
            Line((-35.1931828042, -25), (-40.1931828042, -25))
        make_face()
    extrude(amount=F4_T125_DEPTH)

    split(bisect_by=Plane.XY, keep=Keep.TOP)


with BuildPart() as f4_tool119_1:
    add(f4_tool119.part)

    # F4_t127: intersect F4_tool123
    add(f4_tool123.part, mode=Mode.INTERSECT)


with BuildPart() as f1_13:
    add(f1_12.part)

    # F4_t117: cut F4_tool119
    add(f4_tool119_1.part, mode=Mode.SUBTRACT)


with BuildPart() as f4_tool130:
    # F4_s131 → F4_t132 (new body)
    with BuildSketch(Plane.YZ.offset(-47.6931828042)):
        with BuildLine():
            ThreePointArc((-5, 0), (-1.4644660941, 1.4644660941), (0, 5))
            Line((0, 5), (0, 0))
            Line((0, 0), (-5, 0))
        make_face()
    extrude(amount=F4_T132_DEPTH)

    split(bisect_by=Plane.YZ.offset(-35.1931828042), keep=Keep.BOTTOM)


with BuildPart() as f4_tool134:
    # F4_s135 → F4_t136 (new body)
    with BuildSketch(Plane.XY.offset(-23.1846483105)):
        with BuildLine():
            ThreePointArc((-35.1931828042, -5), (-36.6576488983, -1.4644660941), (-40.1931828042, 0))
            Line((-40.1931828042, 0), (-35.1931828042, 0))
            Line((-35.1931828042, 0), (-35.1931828042, -5))
        make_face()
    extrude(amount=F4_T136_DEPTH)

    split(bisect_by=Plane.XY, keep=Keep.TOP)


with BuildPart() as f4_tool130_1:
    add(f4_tool130.part)

    # F4_t138: intersect F4_tool134
    add(f4_tool134.part, mode=Mode.INTERSECT)


with BuildPart() as f1_14:
    add(f1_13.part)

    # F4_t128: cut F4_tool130
    add(f4_tool130_1.part, mode=Mode.SUBTRACT)

    # F5
    f5_edges = [f1_14.edges().sort_by_distance(p)[0] for p in [
        (-72.999563, -12.5, 56.286573),
        (-61.096373, -25, 56.286573),
        (-61.096373, 0, 56.286573),
        (-72.120884, -0.87868, 56.286573),
        (-72.120884, -24.12132, 56.286573),
    ]]
    fillet(f5_edges, radius=F5_R)

    # F6: fillet of radius 5 on 1 edges, made by hand

    # F6_s2 → F6_t1 (cut)
    with BuildSketch(Plane.XZ.offset(5)):
        with BuildLine():
            ThreePointArc((0, -23.1846483105), (1.4644660941, -26.7201822165), (5, -28.1846483105))
            Line((5, -28.1846483105), (0, -28.1846483105))
            Line((0, -28.1846483105), (0, -23.1846483105))
        make_face()
    extrude(amount=F6_T1_DEPTH, mode=Mode.SUBTRACT)


with BuildPart() as f6_tool4:
    # F6_s5 → F6_t6 (new body)
    with BuildSketch(Plane.YZ.offset(5)):
        with Locations((-2.5, -25.6846483105)):
            Rectangle(F6_S5_W, F6_S5_H)
    extrude(amount=-F6_T6_DEPTH)

    # F6_s7 → F6_t8 (revolve, cut)
    with BuildSketch(Plane(origin=(5, -5, -23.1846483105), x_dir=(0, -0.7071067812, 0.7071067812), z_dir=(0, -0.7071067812, -0.7071067812))):
        with BuildLine():
            ThreePointArc((0, -5), (5, 0), (0, 5))
            Line((0, 5), (0, -5))
        make_face()
    revolve(axis=Axis((5, -5, -23.1846483105), (-1, 0, 0)), mode=Mode.SUBTRACT)


with BuildPart() as f1_15:
    add(f1_14.part)

    # F6_t3: cut F6_tool4
    add(f6_tool4.part, mode=Mode.SUBTRACT)


with BuildPart() as f6_tool10:
    # F6_s11 → F6_t12 (new body)
    with BuildSketch(Plane.YZ.offset(5)):
        with Locations((-22.5, -25.6846483105)):
            Rectangle(F6_S11_W, F6_S11_H)
    extrude(amount=-F6_T12_DEPTH)

    # F6_s13 → F6_t14 (revolve, cut)
    with BuildSketch(Plane(origin=(5, -20, -23.1846483105), x_dir=(0, 0.7071067812, 0.7071067812), z_dir=(0, -0.7071067812, 0.7071067812))):
        with BuildLine():
            ThreePointArc((0, -5), (5, 0), (0, 5))
            Line((0, 5), (0, -5))
        make_face()
    revolve(axis=Axis((5, -20, -23.1846483105), (-1, 0, 0)), mode=Mode.SUBTRACT)


with BuildPart() as f1_16:
    add(f1_15.part)

    # F6_t9: cut F6_tool10
    add(f6_tool10.part, mode=Mode.SUBTRACT)

    # F7 (on face) → F8 (join)
    with BuildSketch(Plane.XY.offset(71.8153516895)):
        Polygon((-46.3257431984, -16.549365595), (-52.3090921342, -19.1820412874), (-40.1931828042, -20), align=None)
        Polygon((-40.4822512322, -6.7235301125), (-52.5981605622, -5.9055713999), (-46.5402058972, -9.130010847), align=None)
    extrude(amount=F8_DEPTH)


solid = f1_16.part
